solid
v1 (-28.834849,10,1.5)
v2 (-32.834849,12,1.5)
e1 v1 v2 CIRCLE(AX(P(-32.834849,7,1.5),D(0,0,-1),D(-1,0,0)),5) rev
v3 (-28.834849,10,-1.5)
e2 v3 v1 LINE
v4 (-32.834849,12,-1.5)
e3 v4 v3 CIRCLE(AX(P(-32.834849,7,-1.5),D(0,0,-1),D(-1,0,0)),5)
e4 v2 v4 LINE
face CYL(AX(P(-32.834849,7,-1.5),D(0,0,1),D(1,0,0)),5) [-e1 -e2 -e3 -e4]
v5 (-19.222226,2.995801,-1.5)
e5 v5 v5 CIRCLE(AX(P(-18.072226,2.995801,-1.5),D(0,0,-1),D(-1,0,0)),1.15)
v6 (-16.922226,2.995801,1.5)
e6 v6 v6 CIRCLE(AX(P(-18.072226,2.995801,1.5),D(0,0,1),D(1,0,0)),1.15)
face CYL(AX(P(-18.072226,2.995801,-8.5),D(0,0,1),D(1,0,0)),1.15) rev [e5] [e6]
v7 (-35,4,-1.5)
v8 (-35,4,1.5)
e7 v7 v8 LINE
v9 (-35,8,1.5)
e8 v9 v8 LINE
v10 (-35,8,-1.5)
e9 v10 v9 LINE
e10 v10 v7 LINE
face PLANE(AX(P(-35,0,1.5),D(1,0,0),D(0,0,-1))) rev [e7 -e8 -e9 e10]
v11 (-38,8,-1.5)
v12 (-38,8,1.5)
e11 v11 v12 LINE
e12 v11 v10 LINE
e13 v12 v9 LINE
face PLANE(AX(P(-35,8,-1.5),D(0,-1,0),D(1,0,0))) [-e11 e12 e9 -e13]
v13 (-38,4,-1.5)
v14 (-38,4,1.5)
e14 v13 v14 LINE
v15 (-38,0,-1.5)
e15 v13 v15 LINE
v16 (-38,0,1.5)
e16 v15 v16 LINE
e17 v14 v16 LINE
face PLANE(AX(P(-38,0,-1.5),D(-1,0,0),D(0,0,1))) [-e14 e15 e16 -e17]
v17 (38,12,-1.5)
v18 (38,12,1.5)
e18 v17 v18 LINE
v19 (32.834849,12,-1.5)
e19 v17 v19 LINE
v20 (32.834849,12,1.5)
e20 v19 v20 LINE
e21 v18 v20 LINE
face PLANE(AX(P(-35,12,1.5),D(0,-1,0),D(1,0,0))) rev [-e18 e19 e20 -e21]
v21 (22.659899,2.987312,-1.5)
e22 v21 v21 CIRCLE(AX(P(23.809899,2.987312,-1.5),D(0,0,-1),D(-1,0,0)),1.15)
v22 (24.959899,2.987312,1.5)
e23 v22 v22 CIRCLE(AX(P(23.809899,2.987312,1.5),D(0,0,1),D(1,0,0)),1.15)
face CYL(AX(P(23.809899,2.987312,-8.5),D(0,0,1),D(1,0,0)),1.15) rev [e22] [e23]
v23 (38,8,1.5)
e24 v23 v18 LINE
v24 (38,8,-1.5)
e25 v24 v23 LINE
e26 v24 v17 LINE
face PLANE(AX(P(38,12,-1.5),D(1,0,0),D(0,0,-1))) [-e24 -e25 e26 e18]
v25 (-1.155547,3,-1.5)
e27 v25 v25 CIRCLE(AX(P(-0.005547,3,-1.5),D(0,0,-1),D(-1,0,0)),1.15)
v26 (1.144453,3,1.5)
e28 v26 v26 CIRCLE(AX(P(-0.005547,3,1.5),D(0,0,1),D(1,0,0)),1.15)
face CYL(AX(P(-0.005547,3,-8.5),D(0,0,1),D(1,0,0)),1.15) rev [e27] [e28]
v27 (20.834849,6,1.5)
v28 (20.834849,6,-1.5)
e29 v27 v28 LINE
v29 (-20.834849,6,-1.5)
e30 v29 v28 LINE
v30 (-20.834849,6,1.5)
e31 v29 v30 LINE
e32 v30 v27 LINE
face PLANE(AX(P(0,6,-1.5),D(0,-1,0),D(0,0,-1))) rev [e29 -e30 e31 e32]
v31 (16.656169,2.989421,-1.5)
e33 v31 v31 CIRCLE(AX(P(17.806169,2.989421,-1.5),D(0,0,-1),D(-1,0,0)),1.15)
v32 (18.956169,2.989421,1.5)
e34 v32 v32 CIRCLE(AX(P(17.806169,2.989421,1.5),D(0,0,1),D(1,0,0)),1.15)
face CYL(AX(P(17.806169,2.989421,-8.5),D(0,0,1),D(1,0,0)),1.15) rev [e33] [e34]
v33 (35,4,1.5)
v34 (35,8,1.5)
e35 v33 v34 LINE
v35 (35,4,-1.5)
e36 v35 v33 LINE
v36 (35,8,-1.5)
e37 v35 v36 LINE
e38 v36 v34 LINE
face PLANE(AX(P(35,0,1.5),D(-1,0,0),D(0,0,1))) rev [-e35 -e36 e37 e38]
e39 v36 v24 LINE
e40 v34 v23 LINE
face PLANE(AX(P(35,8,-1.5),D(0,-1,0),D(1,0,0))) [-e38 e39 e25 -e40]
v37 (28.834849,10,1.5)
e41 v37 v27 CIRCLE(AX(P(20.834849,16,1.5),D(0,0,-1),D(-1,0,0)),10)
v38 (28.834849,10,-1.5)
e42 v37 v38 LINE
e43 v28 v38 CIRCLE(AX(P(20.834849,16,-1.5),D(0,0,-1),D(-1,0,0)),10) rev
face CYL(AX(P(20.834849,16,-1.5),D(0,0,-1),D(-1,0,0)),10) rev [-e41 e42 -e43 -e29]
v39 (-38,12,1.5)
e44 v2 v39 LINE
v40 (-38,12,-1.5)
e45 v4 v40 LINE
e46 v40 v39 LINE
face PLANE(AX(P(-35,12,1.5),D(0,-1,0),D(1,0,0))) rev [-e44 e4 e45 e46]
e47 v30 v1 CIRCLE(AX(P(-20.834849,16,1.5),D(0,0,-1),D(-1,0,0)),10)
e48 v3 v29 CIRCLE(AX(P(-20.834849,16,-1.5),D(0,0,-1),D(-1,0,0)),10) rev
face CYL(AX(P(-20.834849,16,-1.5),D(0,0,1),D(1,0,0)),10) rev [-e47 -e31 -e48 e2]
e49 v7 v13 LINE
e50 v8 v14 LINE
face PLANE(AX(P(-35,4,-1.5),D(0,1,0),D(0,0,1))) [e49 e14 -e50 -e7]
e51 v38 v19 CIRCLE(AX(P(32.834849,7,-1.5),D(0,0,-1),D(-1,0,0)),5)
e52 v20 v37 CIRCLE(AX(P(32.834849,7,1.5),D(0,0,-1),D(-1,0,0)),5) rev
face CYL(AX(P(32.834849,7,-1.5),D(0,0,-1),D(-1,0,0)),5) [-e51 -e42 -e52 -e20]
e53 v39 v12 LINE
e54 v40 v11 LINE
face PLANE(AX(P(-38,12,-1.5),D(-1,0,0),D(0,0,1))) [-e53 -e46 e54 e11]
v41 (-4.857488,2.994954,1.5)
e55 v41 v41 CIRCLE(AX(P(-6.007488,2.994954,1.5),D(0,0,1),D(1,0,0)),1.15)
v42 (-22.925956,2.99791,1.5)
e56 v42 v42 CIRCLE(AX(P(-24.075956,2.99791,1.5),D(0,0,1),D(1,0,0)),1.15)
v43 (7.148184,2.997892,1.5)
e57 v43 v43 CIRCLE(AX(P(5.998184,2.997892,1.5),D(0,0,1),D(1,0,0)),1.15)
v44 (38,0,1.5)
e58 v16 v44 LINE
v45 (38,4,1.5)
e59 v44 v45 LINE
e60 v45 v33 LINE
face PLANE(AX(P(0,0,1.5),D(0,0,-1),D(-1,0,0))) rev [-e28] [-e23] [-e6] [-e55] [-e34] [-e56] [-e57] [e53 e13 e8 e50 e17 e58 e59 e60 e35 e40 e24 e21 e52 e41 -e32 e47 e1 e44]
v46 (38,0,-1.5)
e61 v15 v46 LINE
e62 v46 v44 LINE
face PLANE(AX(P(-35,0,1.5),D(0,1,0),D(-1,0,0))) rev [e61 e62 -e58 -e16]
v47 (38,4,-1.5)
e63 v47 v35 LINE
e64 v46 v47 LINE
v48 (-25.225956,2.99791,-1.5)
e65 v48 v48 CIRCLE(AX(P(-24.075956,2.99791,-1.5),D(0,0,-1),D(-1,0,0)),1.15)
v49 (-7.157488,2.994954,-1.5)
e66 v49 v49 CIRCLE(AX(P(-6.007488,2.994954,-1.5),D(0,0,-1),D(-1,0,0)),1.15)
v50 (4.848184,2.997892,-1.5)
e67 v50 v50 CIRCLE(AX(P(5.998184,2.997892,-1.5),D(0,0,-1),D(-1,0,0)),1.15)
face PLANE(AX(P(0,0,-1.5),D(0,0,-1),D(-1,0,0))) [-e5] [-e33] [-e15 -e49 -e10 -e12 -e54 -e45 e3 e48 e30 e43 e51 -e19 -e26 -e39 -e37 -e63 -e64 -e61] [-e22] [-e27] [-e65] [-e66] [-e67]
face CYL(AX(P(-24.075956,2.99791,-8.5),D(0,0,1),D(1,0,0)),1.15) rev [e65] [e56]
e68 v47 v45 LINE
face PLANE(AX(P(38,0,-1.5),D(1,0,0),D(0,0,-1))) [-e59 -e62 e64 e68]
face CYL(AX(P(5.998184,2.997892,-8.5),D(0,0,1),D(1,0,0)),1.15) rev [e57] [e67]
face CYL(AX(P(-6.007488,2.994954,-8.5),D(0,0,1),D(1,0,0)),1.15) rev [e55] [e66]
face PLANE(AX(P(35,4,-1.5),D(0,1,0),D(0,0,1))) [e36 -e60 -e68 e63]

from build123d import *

# Parameters (mm, degrees)
SKETCH1_W           = 70
SKETCH1_H           = 12
BOSS_EXTRUDE1_DEPTH = 1.5
SKETCH2_W           = 60
SKETCH2_H           = 6
CUT_EXTRUDE1_DEPTH  = 38.121422387
FILLET1_R           = 10
FILLET2_R           = 5
SKETCH3_W           = 3
SKETCH3_H           = 4
BOSS_EXTRUDE2_DEPTH = 3
SKETCH5_R           = 1.15
CUT_EXTRUDE4_DEPTH  = 10


with BuildPart() as part:
    # Sketch1 → Boss-Extrude1 (new, symmetric)
    with BuildSketch(Plane.XY):
        with Locations((0, 6)):
            Rectangle(SKETCH1_W, SKETCH1_H)
    extrude(amount=BOSS_EXTRUDE1_DEPTH, both=True)

    # Sketch2 → Cut-Extrude1 (cut, through all)
    with BuildSketch(Plane.XY.offset(1.5)):
        with Locations((0, 9)):
            Rectangle(SKETCH2_W, SKETCH2_H)
    extrude(amount=-CUT_EXTRUDE1_DEPTH, mode=Mode.SUBTRACT)

    # Fillet1
    # the kernel refuses this fillet: 10 mm, written as the material it adds along each edge
    with BuildSketch(Plane(origin=(30, 6, 1.5), x_dir=(-1, 0, 0), z_dir=(0, 0, -1))) as fillet1_piece_1:
        with BuildLine():
            CenterArc((9.16515139, 10), FILLET1_R, 203.578178478, 66.421821522)
            Line((0, 6), (-0.183303028, 5.92))
            ThreePointArc((-0.183303028, 5.92), (-0.2, 3), (-0.2, 0))
            Line((-0.2, 0), (0, -0.2))
            Line((0, -0.2), (9.16515139, -0.2))
            Line((9.16515139, -0.2), (9.16515139, 0))
        make_face()
    extrude(amount=3)
    with BuildSketch(Plane(origin=(-30, 6, 1.5), x_dir=(0, 1, 0), z_dir=(0, 0, -1))) as fillet1_piece_2:
        with BuildLine():
            CenterArc((10, 9.16515139), FILLET1_R, 180, 66.421821522)
            Line((0, 9.16515139), (-0.2, 9.16515139))
            Line((-0.2, 9.16515139), (-0.2, 0))
            Line((-0.2, 0), (0, -0.2))
            ThreePointArc((0, -0.2), (3, -0.2), (5.92, -0.183303028))
            Line((5.92, -0.183303028), (6, 0))
        make_face()
    extrude(amount=3)

    # Fillet2
    fillet2_edges = [part.edges().sort_by_distance(p)[0] for p in [
        (-30, 12, 0),
        (30, 12, 0),
    ]]
    fillet(fillet2_edges, radius=FILLET2_R)

    # Sketch3 → Boss-Extrude2 (add)
    with BuildSketch(Plane.XY.offset(1.5)):
        with Locations((36.5, 10)):
            Rectangle(SKETCH3_W, SKETCH3_H)
        with Locations((36.5, 2)):
            Rectangle(SKETCH3_W, SKETCH3_H)
        with Locations((-36.5, 2)):
            Rectangle(SKETCH3_W, SKETCH3_H)
        with Locations((-36.5, 10)):
            Rectangle(SKETCH3_W, SKETCH3_H)
    extrude(amount=-BOSS_EXTRUDE2_DEPTH)

    # Sketch5 → Cut-Extrude4 (cut)
    with BuildSketch(Plane.XY.offset(1.5)):
        with Locations((-0.005546517, 3)):
            Circle(SKETCH5_R)
        with Locations((-6.007488167, 2.994954434)):
            Circle(SKETCH5_R)
        with Locations((5.998183632, 2.997891531)):
            Circle(SKETCH5_R)
        with Locations((17.806168734, 2.989420739)):
            Circle(SKETCH5_R)
        with Locations((23.809898884, 2.98731227)):
            Circle(SKETCH5_R)
        with Locations((-24.075956243, 2.997909584)):
            Circle(SKETCH5_R)
        with Locations((-18.072226094, 2.995801115)):
            Circle(SKETCH5_R)
    extrude(amount=-CUT_EXTRUDE4_DEPTH, mode=Mode.SUBTRACT)


solid = part.part
